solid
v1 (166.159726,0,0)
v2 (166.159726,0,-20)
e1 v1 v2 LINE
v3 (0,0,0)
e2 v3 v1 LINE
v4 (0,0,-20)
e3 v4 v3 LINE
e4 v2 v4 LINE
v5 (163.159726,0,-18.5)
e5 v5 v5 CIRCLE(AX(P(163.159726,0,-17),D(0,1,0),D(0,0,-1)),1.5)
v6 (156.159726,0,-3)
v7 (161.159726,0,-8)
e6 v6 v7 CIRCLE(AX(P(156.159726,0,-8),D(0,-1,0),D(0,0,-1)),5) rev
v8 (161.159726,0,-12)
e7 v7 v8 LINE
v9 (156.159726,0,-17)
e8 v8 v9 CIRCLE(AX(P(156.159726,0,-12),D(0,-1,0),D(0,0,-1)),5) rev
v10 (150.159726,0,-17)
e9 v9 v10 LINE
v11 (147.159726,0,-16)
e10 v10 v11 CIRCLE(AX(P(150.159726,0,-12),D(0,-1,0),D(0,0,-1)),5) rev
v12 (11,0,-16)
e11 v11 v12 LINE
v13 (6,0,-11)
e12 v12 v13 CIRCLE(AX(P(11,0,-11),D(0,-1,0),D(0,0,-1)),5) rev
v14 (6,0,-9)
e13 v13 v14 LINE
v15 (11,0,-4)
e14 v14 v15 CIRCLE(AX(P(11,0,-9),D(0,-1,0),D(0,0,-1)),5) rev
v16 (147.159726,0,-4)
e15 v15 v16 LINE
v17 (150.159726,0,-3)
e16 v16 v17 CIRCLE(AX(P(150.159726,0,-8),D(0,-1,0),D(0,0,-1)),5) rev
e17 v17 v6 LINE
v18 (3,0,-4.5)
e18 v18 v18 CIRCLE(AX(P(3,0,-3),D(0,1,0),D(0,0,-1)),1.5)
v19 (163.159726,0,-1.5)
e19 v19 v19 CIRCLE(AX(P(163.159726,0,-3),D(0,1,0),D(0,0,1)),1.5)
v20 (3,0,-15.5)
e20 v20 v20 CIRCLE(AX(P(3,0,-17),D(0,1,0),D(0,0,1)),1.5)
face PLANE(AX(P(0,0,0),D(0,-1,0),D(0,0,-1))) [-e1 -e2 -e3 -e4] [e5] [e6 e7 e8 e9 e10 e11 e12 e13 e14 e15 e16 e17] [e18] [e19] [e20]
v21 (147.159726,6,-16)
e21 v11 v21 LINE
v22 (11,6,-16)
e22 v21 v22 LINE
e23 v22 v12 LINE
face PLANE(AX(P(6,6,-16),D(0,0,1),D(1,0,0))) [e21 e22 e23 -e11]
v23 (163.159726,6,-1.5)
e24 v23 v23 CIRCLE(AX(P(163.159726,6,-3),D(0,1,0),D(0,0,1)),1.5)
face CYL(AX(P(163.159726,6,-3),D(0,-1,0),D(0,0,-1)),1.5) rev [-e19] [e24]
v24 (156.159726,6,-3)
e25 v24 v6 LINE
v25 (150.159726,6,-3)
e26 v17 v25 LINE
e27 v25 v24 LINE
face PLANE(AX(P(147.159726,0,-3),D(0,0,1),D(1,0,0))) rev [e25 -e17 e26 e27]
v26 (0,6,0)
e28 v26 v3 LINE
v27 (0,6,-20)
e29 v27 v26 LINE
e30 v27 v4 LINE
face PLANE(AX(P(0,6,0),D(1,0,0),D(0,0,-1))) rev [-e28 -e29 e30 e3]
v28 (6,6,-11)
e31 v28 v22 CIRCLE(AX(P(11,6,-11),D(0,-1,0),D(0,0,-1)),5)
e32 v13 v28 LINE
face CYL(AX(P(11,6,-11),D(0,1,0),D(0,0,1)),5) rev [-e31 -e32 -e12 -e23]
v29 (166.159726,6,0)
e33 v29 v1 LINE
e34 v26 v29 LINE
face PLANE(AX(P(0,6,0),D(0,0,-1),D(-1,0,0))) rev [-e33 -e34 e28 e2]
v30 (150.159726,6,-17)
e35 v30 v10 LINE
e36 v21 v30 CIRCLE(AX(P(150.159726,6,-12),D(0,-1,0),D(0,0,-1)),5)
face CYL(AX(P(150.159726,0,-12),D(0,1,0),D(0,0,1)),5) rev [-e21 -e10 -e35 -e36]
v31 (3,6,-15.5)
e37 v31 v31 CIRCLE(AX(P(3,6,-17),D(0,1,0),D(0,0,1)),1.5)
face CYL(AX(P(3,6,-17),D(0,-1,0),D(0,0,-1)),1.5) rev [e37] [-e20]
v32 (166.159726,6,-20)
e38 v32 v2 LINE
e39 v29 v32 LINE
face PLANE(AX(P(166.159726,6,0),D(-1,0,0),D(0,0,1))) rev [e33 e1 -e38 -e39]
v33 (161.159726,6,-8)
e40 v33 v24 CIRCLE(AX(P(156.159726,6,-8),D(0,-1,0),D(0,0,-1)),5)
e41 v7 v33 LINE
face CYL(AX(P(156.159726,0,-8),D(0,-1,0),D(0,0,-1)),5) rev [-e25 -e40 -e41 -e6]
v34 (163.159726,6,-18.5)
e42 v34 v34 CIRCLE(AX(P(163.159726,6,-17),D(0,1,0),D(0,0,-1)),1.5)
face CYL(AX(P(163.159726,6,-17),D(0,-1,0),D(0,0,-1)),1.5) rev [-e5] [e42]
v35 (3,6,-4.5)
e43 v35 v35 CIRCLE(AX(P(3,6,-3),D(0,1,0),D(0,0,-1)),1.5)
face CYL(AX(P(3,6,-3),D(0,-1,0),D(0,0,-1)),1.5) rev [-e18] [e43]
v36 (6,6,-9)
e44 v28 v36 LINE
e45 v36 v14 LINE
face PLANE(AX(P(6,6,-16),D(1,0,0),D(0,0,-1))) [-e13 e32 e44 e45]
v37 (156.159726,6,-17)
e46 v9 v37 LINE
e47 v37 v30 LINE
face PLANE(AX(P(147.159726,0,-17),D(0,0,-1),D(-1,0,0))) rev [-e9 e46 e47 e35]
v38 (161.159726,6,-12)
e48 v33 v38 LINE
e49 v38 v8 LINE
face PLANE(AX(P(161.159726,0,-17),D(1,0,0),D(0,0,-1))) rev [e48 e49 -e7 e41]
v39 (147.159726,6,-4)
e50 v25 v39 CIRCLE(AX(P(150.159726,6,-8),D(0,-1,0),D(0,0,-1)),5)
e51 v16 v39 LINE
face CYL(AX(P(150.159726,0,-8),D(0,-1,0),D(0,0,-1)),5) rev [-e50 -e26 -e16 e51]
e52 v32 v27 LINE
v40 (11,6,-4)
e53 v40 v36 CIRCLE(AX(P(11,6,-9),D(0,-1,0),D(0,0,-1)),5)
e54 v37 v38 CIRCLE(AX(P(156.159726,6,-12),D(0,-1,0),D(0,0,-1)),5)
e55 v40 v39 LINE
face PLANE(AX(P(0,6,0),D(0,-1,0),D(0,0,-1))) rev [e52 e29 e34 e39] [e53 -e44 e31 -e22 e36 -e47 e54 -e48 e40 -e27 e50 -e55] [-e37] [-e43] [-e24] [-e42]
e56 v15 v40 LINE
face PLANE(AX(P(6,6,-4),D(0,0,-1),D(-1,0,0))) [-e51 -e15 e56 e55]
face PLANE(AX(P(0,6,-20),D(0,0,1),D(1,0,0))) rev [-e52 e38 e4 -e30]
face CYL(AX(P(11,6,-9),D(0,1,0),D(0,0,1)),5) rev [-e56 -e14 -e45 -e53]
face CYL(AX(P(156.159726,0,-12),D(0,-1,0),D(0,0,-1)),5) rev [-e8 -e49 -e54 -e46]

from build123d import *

# Parameters (mm, degrees)
SKETCH1_W           = 166.159725664
SKETCH1_H           = 20
SKETCH1_R           = 1.5
SKETCH1_W_2         = 154.159725664
SKETCH1_H_2         = 12
BOSS_EXTRUDE1_DEPTH = 6
CUT_EXTRUDE1_DEPTH  = 168.466577062
FILLET1_R           = 5


with BuildPart() as part:
    # Sketch1 → Boss-Extrude1 (new body)
    with BuildSketch(Plane(origin=(0, 0, 0), x_dir=(1, 0, 0), z_dir=(0, 1, 0))):
        with Locations((83.079862832, 10)):
            Rectangle(SKETCH1_W, SKETCH1_H)
        with Locations(Location((3, 17, 0), (0, 0, 270))):
            Circle(SKETCH1_R, mode=Mode.SUBTRACT)
        with Locations(Location((3, 3, 0), (0, 0, 90))):
            Circle(SKETCH1_R, mode=Mode.SUBTRACT)
        with Locations(Location((163.159725664, 3, 0), (0, 0, 270))):
            Circle(SKETCH1_R, mode=Mode.SUBTRACT)
        with Locations(Location((163.159725664, 17, 0), (0, 0, 90))):
            Circle(SKETCH1_R, mode=Mode.SUBTRACT)
        with Locations((83.079862832, 10)):
            Rectangle(SKETCH1_W_2, SKETCH1_H_2, mode=Mode.SUBTRACT)
    extrude(amount=BOSS_EXTRUDE1_DEPTH)

    # Sketch2 → Cut-Extrude1 (cut, through all)
    with BuildSketch(Plane(origin=(0, 6, 0), x_dir=(1, 0, 0), z_dir=(0, 1, 0))):
        Polygon((147.159725664, 17), (147.159725664, 16), (160.159725664, 16), (160.159725664, 4), (147.159725664, 4), (147.159725664, 3), (161.159725664, 3), (161.159725664, 17), align=None)
    extrude(amount=-CUT_EXTRUDE1_DEPTH, mode=Mode.SUBTRACT)

    # Fillet1
    # the kernel refuses this fillet: 5 mm, written as the material it adds along each edge
    with BuildSketch(Plane(origin=(161.159725664, 6, -17), x_dir=(0, 0, 1), z_dir=(0, -1, 0)), Plane(origin=(161.159725664, 6, -3), x_dir=(-1, 0, 0), z_dir=(0, -1, 0)), Plane(origin=(6, 0, -16), x_dir=(0, 0, 1), z_dir=(0, 1, 0))) as fillet1_piece_1:
        with BuildLine():
            CenterArc((FILLET1_R, FILLET1_R), FILLET1_R, 180, 90)
            Line((0, FILLET1_R), (-FILLET1_R * 0.02, FILLET1_R))
            Line((-FILLET1_R * 0.02, FILLET1_R), (-FILLET1_R * 0.02, -FILLET1_R * 0.02))
            Line((-FILLET1_R * 0.02, -FILLET1_R * 0.02), (FILLET1_R, -FILLET1_R * 0.02))
            Line((FILLET1_R, -FILLET1_R * 0.02), (FILLET1_R, 0))
        make_face()
    extrude(amount=6)
    with BuildSketch(Plane(origin=(147.159725664, 6, -17), x_dir=(1, 0, 0), z_dir=(0, -1, 0))) as fillet1_piece_2:
        with BuildLine():
            CenterArc((3, 5), FILLET1_R, 233.130102354, 36.869897646)
            Line((0, 1), (-0.06, 0.92))
            ThreePointArc((-0.06, 0.92), (-0.1, 0.5), (-0.1, 0))
            Line((-0.1, 0), (0, -0.1))
            Line((0, -0.1), (3, -0.1))
            Line((3, -0.1), (3, 0))
        make_face()
    extrude(amount=6)
    with BuildSketch(Plane(origin=(147.159725664, 6, -3), x_dir=(0, 0, -1), z_dir=(0, -1, 0))) as fillet1_piece_3:
        with BuildLine():
            CenterArc((5, 3), FILLET1_R, 180, 36.869897646)
            Line((0, 3), (-0.1, 3))
            Line((-0.1, 3), (-0.1, 0))
            Line((-0.1, 0), (0, -0.1))
            ThreePointArc((0, -0.1), (0.5, -0.1), (0.92, -0.06))
            Line((0.92, -0.06), (1, 0))
        make_face()
    extrude(amount=6)
    with BuildSketch(Plane(origin=(6, 0, -4), x_dir=(0, 0, -1), z_dir=(0, 1, 0))) as fillet1_piece_4:
        with BuildLine():
            CenterArc((FILLET1_R, -FILLET1_R), FILLET1_R, 90, 90)
            Line((0, -FILLET1_R), (-FILLET1_R * 0.02, -FILLET1_R))
            Line((-FILLET1_R * 0.02, -FILLET1_R), (-FILLET1_R * 0.02, FILLET1_R * 0.02))
            Line((-FILLET1_R * 0.02, FILLET1_R * 0.02), (FILLET1_R, FILLET1_R * 0.02))
            Line((FILLET1_R, FILLET1_R * 0.02), (FILLET1_R, 0))
        make_face()
    extrude(amount=6)


solid = part.part
